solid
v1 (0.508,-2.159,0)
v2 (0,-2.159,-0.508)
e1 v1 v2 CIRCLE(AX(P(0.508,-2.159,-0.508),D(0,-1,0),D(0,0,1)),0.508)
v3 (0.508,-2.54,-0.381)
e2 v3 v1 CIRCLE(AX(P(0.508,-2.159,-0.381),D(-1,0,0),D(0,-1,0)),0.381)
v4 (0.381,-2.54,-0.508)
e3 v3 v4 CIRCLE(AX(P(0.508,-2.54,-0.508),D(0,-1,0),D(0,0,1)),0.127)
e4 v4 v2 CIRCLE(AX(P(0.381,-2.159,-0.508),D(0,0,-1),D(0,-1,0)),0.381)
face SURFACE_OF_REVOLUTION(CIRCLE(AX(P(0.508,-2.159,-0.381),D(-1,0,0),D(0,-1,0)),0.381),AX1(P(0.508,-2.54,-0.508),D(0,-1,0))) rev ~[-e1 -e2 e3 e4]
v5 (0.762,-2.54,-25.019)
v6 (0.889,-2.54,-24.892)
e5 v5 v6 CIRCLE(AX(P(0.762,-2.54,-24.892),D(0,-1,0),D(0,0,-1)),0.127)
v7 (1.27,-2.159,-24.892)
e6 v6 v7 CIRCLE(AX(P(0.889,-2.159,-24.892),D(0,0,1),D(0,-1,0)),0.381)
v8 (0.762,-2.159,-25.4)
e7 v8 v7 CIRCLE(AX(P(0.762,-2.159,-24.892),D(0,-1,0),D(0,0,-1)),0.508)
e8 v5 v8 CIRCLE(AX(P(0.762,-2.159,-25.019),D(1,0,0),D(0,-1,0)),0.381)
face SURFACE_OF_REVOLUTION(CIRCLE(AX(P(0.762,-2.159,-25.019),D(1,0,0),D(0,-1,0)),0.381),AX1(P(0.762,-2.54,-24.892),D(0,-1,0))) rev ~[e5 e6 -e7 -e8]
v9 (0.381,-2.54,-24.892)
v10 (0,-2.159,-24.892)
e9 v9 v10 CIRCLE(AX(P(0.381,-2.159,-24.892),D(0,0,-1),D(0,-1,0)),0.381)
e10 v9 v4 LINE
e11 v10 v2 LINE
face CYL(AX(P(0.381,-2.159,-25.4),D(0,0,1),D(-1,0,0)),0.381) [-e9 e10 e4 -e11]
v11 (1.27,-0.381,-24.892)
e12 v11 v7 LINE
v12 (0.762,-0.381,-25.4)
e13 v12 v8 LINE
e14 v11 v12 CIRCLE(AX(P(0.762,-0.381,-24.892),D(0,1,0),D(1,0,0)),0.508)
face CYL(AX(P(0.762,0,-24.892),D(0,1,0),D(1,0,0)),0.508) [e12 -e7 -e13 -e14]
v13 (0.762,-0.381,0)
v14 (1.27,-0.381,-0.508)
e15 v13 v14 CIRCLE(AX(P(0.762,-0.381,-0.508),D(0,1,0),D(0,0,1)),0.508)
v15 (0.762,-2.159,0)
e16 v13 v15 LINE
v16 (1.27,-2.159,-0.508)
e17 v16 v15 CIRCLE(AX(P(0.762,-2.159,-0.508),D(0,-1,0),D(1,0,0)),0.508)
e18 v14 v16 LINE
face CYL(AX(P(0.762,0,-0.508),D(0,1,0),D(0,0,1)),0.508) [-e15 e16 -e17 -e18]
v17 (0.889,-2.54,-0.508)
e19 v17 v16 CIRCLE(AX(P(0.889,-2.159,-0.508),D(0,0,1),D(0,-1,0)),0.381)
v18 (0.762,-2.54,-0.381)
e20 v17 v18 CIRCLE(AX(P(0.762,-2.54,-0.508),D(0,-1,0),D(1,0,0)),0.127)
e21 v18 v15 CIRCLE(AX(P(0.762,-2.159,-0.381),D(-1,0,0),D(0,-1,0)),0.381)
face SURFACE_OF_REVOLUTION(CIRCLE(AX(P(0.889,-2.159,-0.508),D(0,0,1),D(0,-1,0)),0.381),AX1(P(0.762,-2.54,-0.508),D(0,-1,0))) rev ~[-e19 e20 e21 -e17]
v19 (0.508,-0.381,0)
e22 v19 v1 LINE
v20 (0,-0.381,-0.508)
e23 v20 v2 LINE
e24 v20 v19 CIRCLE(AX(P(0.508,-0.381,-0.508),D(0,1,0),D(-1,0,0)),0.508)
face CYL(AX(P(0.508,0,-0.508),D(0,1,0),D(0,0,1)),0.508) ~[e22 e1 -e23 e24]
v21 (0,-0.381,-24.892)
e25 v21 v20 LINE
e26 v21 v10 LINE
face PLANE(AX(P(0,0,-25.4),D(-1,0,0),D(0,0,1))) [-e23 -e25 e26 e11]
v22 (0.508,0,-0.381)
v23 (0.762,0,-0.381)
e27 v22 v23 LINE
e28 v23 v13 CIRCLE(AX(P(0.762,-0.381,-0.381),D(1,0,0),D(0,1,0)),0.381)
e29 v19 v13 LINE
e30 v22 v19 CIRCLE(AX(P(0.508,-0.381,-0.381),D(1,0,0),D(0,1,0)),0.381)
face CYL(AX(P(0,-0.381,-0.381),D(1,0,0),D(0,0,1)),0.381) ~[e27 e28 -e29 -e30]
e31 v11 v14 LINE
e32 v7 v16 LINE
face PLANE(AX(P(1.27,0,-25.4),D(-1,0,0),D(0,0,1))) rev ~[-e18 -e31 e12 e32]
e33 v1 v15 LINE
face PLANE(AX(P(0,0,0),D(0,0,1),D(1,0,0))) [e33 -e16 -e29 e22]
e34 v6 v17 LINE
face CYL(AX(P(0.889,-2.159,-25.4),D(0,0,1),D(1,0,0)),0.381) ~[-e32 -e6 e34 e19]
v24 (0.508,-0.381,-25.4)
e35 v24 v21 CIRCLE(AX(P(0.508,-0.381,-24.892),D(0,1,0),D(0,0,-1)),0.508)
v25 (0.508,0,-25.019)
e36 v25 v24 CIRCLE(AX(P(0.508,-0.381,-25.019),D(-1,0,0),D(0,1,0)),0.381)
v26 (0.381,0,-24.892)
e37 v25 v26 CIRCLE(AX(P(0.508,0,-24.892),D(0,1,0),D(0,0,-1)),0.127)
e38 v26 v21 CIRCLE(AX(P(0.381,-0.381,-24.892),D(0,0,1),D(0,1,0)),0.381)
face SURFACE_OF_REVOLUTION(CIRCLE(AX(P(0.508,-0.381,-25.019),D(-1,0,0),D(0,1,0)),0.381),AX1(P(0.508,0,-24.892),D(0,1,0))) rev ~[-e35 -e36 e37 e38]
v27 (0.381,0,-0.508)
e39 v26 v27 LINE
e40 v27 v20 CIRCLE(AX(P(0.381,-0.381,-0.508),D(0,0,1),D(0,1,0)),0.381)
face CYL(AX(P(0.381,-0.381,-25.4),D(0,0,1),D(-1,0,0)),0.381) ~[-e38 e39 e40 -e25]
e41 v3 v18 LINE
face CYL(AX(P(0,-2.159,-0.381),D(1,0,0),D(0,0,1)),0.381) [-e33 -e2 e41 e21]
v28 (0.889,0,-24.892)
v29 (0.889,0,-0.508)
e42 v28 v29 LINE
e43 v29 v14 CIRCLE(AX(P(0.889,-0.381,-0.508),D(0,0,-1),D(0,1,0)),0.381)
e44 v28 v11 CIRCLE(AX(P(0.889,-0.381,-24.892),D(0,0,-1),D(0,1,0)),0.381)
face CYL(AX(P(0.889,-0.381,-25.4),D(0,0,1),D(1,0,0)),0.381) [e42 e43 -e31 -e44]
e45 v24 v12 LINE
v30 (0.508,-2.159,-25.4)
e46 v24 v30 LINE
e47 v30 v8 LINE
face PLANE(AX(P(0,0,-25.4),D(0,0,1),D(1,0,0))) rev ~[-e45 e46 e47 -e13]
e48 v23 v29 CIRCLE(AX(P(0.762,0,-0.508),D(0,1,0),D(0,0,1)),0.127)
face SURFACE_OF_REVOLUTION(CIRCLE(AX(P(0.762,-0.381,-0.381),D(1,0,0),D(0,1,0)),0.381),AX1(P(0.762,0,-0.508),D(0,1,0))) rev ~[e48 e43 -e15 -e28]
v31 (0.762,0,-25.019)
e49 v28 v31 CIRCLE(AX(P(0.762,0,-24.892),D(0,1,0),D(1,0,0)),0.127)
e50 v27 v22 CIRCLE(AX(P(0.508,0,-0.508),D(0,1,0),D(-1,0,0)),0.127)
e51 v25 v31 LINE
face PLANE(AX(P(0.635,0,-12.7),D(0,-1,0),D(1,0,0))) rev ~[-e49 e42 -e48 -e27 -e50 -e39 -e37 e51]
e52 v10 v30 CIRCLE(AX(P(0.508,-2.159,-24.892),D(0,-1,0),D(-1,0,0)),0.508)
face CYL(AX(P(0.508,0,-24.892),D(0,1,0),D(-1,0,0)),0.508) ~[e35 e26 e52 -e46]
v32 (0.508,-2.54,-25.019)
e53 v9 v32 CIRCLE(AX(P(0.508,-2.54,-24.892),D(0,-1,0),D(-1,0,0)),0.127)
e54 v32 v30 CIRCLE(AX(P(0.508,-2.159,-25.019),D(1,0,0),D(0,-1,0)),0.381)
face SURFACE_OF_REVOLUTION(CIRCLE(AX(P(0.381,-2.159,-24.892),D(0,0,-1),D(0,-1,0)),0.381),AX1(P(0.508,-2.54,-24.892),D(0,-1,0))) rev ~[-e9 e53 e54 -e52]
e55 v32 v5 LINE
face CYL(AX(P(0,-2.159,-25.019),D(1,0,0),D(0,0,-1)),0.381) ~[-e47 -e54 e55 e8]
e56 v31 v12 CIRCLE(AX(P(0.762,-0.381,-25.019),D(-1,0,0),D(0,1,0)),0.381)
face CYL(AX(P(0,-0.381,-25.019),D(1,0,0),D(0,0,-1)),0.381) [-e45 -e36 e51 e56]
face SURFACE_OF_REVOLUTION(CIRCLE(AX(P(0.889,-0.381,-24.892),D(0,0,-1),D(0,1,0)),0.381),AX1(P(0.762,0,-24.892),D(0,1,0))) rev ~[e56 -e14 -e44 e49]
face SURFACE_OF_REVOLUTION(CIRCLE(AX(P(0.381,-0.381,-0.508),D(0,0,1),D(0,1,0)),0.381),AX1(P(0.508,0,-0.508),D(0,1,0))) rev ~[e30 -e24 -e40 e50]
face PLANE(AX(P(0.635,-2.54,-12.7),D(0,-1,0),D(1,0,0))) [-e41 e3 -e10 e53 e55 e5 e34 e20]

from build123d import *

# Parameters (mm, degrees)
F0_W         = 1.27
F0_H         = 25.4
F2_DEPTH     = 2.54
F3_R         = 0.381
F1_T1_DEPTH  = 2.54
F1_T4_ANGLE  = 90
F1_T6_ANGLE  = 90
F1_T8_ANGLE  = 90
F1_T10_ANGLE = 90
F1_T12_ANGLE = 90
F1_T14_ANGLE = 90
F1_T16_ANGLE = 90
F1_T18_ANGLE = 90


# Not quite as in the source:
# - a fillet or chamfer that OpenCascade refuses, or shapes differently, is made with other operations: its cross-section is extruded or revolved along the edge and cut away or added


with BuildPart() as f2:
    # F0 (on Front) → F2 (new body)
    with BuildSketch(Plane.XZ):
        with Locations((0.635, -12.7)):
            Rectangle(F0_W, F0_H)
    extrude(amount=F2_DEPTH)

    # F3
    f3_edges = [f2.edges().sort_by_distance(p)[0] for p in [
        (0.635, -2.54, 0),
        (0, -2.54, -12.7),
        (0.635, -2.54, -25.4),
        (1.27, -2.54, -12.7),
        (1.27, 0, -12.7),
        (0.635, 0, 0),
        (0, 0, -12.7),
        (0.635, 0, -25.4),
    ]]
    fillet(f3_edges, radius=F3_R)

    # F1: fillet of radius 0.508 on 4 edges, made by hand

    # F1_s2 → F1_t1 (cut)
    with BuildSketch(Plane.XZ):
        with BuildLine():
            ThreePointArc((0, -24.892), (0.1487897552, -25.2512102448), (0.508, -25.4))
            Line((0.508, -25.4), (0, -25.4))
            Line((0, -25.4), (0, -24.892))
        make_face()
        with BuildLine():
            ThreePointArc((1.27, -24.892), (1.1212102448, -25.2512102448), (0.762, -25.4))
            Line((0.762, -25.4), (1.27, -25.4))
            Line((1.27, -25.4), (1.27, -24.892))
        make_face()
        with BuildLine():
            ThreePointArc((0.508, 0), (0.1487897552, -0.1487897552), (0, -0.508))
            Line((0, -0.508), (0, 0))
            Line((0, 0), (0.508, 0))
        make_face()
        with BuildLine():
            ThreePointArc((0.762, 0), (1.1212102448, -0.1487897552), (1.27, -0.508))
            Line((1.27, -0.508), (1.27, 0))
            Line((1.27, 0), (0.762, 0))
        make_face()
    extrude(amount=F1_T1_DEPTH, mode=Mode.SUBTRACT)

    # F1_s3 → F1_t4 (revolve, cut)
    with BuildSketch(Plane.YZ.offset(0.762)):
        with BuildLine():
            ThreePointArc((0, -0.381), (-0.1115923164, -0.1115923164), (-0.381, 0))
            Line((-0.381, 0), (0, 0))
            Line((0, 0), (0, -0.381))
        make_face()
    revolve(axis=Axis((0.762, 0, -0.508), (0, 1, 0)), revolution_arc=F1_T4_ANGLE, mode=Mode.SUBTRACT)

    # F1_s5 → F1_t6 (revolve, cut)
    with BuildSketch(Plane.XY.offset(-0.508)):
        with BuildLine():
            ThreePointArc((0.889, -2.54), (1.1584076836, -2.4284076836), (1.27, -2.159))
            Line((1.27, -2.159), (1.27, -2.54))
            Line((1.27, -2.54), (0.889, -2.54))
        make_face()
    revolve(axis=Axis((0.762, -2.54, -0.508), (0, -1, 0)), revolution_arc=F1_T6_ANGLE, mode=Mode.SUBTRACT)

    # F1_s7 → F1_t8 (revolve, cut)
    with BuildSketch(Plane.XY.offset(-0.508)):
        with BuildLine():
            ThreePointArc((0.381, 0), (0.1115923164, -0.1115923164), (0, -0.381))
            Line((0, -0.381), (0, 0))
            Line((0, 0), (0.381, 0))
        make_face()
    revolve(axis=Axis((0.508, 0, -0.508), (0, 1, 0)), revolution_arc=F1_T8_ANGLE, mode=Mode.SUBTRACT)

    # F1_s9 → F1_t10 (revolve, cut)
    with BuildSketch(Plane.YZ.offset(0.508)):
        with BuildLine():
            ThreePointArc((-2.54, -0.381), (-2.4284076836, -0.1115923164), (-2.159, 0))
            Line((-2.159, 0), (-2.54, 0))
            Line((-2.54, 0), (-2.54, -0.381))
        make_face()
    revolve(axis=Axis((0.508, -2.54, -0.508), (0, -1, 0)), revolution_arc=F1_T10_ANGLE, mode=Mode.SUBTRACT)

    # F1_s11 → F1_t12 (revolve, cut)
    with BuildSketch(Plane.XY.offset(-24.892)):
        with BuildLine():
            ThreePointArc((0.889, 0), (1.1584076836, -0.1115923164), (1.27, -0.381))
            Line((1.27, -0.381), (1.27, 0))
            Line((1.27, 0), (0.889, 0))
        make_face()
    revolve(axis=Axis((0.762, 0, -24.892), (0, 1, 0)), revolution_arc=F1_T12_ANGLE, mode=Mode.SUBTRACT)

    # F1_s13 → F1_t14 (revolve, cut)
    with BuildSketch(Plane.YZ.offset(0.762)):
        with BuildLine():
            ThreePointArc((-2.54, -25.019), (-2.4284076836, -25.2884076836), (-2.159, -25.4))
            Line((-2.159, -25.4), (-2.54, -25.4))
            Line((-2.54, -25.4), (-2.54, -25.019))
        make_face()
    revolve(axis=Axis((0.762, -2.54, -24.892), (0, -1, 0)), revolution_arc=F1_T14_ANGLE, mode=Mode.SUBTRACT)

    # F1_s15 → F1_t16 (revolve, cut)
    with BuildSketch(Plane.YZ.offset(0.508)):
        with BuildLine():
            ThreePointArc((0, -25.019), (-0.1115923164, -25.2884076836), (-0.381, -25.4))
            Line((-0.381, -25.4), (0, -25.4))
            Line((0, -25.4), (0, -25.019))
        make_face()
    revolve(axis=Axis((0.508, 0, -24.892), (0, 1, 0)), revolution_arc=F1_T16_ANGLE, mode=Mode.SUBTRACT)

    # F1_s17 → F1_t18 (revolve, cut)
    with BuildSketch(Plane.XY.offset(-24.892)):
        with BuildLine():
            ThreePointArc((0.381, -2.54), (0.1115923164, -2.4284076836), (0, -2.159))
            Line((0, -2.159), (0, -2.54))
            Line((0, -2.54), (0.381, -2.54))
        make_face()
    revolve(axis=Axis((0.508, -2.54, -24.892), (0, -1, 0)), revolution_arc=F1_T18_ANGLE, mode=Mode.SUBTRACT)


solid = f2.part
